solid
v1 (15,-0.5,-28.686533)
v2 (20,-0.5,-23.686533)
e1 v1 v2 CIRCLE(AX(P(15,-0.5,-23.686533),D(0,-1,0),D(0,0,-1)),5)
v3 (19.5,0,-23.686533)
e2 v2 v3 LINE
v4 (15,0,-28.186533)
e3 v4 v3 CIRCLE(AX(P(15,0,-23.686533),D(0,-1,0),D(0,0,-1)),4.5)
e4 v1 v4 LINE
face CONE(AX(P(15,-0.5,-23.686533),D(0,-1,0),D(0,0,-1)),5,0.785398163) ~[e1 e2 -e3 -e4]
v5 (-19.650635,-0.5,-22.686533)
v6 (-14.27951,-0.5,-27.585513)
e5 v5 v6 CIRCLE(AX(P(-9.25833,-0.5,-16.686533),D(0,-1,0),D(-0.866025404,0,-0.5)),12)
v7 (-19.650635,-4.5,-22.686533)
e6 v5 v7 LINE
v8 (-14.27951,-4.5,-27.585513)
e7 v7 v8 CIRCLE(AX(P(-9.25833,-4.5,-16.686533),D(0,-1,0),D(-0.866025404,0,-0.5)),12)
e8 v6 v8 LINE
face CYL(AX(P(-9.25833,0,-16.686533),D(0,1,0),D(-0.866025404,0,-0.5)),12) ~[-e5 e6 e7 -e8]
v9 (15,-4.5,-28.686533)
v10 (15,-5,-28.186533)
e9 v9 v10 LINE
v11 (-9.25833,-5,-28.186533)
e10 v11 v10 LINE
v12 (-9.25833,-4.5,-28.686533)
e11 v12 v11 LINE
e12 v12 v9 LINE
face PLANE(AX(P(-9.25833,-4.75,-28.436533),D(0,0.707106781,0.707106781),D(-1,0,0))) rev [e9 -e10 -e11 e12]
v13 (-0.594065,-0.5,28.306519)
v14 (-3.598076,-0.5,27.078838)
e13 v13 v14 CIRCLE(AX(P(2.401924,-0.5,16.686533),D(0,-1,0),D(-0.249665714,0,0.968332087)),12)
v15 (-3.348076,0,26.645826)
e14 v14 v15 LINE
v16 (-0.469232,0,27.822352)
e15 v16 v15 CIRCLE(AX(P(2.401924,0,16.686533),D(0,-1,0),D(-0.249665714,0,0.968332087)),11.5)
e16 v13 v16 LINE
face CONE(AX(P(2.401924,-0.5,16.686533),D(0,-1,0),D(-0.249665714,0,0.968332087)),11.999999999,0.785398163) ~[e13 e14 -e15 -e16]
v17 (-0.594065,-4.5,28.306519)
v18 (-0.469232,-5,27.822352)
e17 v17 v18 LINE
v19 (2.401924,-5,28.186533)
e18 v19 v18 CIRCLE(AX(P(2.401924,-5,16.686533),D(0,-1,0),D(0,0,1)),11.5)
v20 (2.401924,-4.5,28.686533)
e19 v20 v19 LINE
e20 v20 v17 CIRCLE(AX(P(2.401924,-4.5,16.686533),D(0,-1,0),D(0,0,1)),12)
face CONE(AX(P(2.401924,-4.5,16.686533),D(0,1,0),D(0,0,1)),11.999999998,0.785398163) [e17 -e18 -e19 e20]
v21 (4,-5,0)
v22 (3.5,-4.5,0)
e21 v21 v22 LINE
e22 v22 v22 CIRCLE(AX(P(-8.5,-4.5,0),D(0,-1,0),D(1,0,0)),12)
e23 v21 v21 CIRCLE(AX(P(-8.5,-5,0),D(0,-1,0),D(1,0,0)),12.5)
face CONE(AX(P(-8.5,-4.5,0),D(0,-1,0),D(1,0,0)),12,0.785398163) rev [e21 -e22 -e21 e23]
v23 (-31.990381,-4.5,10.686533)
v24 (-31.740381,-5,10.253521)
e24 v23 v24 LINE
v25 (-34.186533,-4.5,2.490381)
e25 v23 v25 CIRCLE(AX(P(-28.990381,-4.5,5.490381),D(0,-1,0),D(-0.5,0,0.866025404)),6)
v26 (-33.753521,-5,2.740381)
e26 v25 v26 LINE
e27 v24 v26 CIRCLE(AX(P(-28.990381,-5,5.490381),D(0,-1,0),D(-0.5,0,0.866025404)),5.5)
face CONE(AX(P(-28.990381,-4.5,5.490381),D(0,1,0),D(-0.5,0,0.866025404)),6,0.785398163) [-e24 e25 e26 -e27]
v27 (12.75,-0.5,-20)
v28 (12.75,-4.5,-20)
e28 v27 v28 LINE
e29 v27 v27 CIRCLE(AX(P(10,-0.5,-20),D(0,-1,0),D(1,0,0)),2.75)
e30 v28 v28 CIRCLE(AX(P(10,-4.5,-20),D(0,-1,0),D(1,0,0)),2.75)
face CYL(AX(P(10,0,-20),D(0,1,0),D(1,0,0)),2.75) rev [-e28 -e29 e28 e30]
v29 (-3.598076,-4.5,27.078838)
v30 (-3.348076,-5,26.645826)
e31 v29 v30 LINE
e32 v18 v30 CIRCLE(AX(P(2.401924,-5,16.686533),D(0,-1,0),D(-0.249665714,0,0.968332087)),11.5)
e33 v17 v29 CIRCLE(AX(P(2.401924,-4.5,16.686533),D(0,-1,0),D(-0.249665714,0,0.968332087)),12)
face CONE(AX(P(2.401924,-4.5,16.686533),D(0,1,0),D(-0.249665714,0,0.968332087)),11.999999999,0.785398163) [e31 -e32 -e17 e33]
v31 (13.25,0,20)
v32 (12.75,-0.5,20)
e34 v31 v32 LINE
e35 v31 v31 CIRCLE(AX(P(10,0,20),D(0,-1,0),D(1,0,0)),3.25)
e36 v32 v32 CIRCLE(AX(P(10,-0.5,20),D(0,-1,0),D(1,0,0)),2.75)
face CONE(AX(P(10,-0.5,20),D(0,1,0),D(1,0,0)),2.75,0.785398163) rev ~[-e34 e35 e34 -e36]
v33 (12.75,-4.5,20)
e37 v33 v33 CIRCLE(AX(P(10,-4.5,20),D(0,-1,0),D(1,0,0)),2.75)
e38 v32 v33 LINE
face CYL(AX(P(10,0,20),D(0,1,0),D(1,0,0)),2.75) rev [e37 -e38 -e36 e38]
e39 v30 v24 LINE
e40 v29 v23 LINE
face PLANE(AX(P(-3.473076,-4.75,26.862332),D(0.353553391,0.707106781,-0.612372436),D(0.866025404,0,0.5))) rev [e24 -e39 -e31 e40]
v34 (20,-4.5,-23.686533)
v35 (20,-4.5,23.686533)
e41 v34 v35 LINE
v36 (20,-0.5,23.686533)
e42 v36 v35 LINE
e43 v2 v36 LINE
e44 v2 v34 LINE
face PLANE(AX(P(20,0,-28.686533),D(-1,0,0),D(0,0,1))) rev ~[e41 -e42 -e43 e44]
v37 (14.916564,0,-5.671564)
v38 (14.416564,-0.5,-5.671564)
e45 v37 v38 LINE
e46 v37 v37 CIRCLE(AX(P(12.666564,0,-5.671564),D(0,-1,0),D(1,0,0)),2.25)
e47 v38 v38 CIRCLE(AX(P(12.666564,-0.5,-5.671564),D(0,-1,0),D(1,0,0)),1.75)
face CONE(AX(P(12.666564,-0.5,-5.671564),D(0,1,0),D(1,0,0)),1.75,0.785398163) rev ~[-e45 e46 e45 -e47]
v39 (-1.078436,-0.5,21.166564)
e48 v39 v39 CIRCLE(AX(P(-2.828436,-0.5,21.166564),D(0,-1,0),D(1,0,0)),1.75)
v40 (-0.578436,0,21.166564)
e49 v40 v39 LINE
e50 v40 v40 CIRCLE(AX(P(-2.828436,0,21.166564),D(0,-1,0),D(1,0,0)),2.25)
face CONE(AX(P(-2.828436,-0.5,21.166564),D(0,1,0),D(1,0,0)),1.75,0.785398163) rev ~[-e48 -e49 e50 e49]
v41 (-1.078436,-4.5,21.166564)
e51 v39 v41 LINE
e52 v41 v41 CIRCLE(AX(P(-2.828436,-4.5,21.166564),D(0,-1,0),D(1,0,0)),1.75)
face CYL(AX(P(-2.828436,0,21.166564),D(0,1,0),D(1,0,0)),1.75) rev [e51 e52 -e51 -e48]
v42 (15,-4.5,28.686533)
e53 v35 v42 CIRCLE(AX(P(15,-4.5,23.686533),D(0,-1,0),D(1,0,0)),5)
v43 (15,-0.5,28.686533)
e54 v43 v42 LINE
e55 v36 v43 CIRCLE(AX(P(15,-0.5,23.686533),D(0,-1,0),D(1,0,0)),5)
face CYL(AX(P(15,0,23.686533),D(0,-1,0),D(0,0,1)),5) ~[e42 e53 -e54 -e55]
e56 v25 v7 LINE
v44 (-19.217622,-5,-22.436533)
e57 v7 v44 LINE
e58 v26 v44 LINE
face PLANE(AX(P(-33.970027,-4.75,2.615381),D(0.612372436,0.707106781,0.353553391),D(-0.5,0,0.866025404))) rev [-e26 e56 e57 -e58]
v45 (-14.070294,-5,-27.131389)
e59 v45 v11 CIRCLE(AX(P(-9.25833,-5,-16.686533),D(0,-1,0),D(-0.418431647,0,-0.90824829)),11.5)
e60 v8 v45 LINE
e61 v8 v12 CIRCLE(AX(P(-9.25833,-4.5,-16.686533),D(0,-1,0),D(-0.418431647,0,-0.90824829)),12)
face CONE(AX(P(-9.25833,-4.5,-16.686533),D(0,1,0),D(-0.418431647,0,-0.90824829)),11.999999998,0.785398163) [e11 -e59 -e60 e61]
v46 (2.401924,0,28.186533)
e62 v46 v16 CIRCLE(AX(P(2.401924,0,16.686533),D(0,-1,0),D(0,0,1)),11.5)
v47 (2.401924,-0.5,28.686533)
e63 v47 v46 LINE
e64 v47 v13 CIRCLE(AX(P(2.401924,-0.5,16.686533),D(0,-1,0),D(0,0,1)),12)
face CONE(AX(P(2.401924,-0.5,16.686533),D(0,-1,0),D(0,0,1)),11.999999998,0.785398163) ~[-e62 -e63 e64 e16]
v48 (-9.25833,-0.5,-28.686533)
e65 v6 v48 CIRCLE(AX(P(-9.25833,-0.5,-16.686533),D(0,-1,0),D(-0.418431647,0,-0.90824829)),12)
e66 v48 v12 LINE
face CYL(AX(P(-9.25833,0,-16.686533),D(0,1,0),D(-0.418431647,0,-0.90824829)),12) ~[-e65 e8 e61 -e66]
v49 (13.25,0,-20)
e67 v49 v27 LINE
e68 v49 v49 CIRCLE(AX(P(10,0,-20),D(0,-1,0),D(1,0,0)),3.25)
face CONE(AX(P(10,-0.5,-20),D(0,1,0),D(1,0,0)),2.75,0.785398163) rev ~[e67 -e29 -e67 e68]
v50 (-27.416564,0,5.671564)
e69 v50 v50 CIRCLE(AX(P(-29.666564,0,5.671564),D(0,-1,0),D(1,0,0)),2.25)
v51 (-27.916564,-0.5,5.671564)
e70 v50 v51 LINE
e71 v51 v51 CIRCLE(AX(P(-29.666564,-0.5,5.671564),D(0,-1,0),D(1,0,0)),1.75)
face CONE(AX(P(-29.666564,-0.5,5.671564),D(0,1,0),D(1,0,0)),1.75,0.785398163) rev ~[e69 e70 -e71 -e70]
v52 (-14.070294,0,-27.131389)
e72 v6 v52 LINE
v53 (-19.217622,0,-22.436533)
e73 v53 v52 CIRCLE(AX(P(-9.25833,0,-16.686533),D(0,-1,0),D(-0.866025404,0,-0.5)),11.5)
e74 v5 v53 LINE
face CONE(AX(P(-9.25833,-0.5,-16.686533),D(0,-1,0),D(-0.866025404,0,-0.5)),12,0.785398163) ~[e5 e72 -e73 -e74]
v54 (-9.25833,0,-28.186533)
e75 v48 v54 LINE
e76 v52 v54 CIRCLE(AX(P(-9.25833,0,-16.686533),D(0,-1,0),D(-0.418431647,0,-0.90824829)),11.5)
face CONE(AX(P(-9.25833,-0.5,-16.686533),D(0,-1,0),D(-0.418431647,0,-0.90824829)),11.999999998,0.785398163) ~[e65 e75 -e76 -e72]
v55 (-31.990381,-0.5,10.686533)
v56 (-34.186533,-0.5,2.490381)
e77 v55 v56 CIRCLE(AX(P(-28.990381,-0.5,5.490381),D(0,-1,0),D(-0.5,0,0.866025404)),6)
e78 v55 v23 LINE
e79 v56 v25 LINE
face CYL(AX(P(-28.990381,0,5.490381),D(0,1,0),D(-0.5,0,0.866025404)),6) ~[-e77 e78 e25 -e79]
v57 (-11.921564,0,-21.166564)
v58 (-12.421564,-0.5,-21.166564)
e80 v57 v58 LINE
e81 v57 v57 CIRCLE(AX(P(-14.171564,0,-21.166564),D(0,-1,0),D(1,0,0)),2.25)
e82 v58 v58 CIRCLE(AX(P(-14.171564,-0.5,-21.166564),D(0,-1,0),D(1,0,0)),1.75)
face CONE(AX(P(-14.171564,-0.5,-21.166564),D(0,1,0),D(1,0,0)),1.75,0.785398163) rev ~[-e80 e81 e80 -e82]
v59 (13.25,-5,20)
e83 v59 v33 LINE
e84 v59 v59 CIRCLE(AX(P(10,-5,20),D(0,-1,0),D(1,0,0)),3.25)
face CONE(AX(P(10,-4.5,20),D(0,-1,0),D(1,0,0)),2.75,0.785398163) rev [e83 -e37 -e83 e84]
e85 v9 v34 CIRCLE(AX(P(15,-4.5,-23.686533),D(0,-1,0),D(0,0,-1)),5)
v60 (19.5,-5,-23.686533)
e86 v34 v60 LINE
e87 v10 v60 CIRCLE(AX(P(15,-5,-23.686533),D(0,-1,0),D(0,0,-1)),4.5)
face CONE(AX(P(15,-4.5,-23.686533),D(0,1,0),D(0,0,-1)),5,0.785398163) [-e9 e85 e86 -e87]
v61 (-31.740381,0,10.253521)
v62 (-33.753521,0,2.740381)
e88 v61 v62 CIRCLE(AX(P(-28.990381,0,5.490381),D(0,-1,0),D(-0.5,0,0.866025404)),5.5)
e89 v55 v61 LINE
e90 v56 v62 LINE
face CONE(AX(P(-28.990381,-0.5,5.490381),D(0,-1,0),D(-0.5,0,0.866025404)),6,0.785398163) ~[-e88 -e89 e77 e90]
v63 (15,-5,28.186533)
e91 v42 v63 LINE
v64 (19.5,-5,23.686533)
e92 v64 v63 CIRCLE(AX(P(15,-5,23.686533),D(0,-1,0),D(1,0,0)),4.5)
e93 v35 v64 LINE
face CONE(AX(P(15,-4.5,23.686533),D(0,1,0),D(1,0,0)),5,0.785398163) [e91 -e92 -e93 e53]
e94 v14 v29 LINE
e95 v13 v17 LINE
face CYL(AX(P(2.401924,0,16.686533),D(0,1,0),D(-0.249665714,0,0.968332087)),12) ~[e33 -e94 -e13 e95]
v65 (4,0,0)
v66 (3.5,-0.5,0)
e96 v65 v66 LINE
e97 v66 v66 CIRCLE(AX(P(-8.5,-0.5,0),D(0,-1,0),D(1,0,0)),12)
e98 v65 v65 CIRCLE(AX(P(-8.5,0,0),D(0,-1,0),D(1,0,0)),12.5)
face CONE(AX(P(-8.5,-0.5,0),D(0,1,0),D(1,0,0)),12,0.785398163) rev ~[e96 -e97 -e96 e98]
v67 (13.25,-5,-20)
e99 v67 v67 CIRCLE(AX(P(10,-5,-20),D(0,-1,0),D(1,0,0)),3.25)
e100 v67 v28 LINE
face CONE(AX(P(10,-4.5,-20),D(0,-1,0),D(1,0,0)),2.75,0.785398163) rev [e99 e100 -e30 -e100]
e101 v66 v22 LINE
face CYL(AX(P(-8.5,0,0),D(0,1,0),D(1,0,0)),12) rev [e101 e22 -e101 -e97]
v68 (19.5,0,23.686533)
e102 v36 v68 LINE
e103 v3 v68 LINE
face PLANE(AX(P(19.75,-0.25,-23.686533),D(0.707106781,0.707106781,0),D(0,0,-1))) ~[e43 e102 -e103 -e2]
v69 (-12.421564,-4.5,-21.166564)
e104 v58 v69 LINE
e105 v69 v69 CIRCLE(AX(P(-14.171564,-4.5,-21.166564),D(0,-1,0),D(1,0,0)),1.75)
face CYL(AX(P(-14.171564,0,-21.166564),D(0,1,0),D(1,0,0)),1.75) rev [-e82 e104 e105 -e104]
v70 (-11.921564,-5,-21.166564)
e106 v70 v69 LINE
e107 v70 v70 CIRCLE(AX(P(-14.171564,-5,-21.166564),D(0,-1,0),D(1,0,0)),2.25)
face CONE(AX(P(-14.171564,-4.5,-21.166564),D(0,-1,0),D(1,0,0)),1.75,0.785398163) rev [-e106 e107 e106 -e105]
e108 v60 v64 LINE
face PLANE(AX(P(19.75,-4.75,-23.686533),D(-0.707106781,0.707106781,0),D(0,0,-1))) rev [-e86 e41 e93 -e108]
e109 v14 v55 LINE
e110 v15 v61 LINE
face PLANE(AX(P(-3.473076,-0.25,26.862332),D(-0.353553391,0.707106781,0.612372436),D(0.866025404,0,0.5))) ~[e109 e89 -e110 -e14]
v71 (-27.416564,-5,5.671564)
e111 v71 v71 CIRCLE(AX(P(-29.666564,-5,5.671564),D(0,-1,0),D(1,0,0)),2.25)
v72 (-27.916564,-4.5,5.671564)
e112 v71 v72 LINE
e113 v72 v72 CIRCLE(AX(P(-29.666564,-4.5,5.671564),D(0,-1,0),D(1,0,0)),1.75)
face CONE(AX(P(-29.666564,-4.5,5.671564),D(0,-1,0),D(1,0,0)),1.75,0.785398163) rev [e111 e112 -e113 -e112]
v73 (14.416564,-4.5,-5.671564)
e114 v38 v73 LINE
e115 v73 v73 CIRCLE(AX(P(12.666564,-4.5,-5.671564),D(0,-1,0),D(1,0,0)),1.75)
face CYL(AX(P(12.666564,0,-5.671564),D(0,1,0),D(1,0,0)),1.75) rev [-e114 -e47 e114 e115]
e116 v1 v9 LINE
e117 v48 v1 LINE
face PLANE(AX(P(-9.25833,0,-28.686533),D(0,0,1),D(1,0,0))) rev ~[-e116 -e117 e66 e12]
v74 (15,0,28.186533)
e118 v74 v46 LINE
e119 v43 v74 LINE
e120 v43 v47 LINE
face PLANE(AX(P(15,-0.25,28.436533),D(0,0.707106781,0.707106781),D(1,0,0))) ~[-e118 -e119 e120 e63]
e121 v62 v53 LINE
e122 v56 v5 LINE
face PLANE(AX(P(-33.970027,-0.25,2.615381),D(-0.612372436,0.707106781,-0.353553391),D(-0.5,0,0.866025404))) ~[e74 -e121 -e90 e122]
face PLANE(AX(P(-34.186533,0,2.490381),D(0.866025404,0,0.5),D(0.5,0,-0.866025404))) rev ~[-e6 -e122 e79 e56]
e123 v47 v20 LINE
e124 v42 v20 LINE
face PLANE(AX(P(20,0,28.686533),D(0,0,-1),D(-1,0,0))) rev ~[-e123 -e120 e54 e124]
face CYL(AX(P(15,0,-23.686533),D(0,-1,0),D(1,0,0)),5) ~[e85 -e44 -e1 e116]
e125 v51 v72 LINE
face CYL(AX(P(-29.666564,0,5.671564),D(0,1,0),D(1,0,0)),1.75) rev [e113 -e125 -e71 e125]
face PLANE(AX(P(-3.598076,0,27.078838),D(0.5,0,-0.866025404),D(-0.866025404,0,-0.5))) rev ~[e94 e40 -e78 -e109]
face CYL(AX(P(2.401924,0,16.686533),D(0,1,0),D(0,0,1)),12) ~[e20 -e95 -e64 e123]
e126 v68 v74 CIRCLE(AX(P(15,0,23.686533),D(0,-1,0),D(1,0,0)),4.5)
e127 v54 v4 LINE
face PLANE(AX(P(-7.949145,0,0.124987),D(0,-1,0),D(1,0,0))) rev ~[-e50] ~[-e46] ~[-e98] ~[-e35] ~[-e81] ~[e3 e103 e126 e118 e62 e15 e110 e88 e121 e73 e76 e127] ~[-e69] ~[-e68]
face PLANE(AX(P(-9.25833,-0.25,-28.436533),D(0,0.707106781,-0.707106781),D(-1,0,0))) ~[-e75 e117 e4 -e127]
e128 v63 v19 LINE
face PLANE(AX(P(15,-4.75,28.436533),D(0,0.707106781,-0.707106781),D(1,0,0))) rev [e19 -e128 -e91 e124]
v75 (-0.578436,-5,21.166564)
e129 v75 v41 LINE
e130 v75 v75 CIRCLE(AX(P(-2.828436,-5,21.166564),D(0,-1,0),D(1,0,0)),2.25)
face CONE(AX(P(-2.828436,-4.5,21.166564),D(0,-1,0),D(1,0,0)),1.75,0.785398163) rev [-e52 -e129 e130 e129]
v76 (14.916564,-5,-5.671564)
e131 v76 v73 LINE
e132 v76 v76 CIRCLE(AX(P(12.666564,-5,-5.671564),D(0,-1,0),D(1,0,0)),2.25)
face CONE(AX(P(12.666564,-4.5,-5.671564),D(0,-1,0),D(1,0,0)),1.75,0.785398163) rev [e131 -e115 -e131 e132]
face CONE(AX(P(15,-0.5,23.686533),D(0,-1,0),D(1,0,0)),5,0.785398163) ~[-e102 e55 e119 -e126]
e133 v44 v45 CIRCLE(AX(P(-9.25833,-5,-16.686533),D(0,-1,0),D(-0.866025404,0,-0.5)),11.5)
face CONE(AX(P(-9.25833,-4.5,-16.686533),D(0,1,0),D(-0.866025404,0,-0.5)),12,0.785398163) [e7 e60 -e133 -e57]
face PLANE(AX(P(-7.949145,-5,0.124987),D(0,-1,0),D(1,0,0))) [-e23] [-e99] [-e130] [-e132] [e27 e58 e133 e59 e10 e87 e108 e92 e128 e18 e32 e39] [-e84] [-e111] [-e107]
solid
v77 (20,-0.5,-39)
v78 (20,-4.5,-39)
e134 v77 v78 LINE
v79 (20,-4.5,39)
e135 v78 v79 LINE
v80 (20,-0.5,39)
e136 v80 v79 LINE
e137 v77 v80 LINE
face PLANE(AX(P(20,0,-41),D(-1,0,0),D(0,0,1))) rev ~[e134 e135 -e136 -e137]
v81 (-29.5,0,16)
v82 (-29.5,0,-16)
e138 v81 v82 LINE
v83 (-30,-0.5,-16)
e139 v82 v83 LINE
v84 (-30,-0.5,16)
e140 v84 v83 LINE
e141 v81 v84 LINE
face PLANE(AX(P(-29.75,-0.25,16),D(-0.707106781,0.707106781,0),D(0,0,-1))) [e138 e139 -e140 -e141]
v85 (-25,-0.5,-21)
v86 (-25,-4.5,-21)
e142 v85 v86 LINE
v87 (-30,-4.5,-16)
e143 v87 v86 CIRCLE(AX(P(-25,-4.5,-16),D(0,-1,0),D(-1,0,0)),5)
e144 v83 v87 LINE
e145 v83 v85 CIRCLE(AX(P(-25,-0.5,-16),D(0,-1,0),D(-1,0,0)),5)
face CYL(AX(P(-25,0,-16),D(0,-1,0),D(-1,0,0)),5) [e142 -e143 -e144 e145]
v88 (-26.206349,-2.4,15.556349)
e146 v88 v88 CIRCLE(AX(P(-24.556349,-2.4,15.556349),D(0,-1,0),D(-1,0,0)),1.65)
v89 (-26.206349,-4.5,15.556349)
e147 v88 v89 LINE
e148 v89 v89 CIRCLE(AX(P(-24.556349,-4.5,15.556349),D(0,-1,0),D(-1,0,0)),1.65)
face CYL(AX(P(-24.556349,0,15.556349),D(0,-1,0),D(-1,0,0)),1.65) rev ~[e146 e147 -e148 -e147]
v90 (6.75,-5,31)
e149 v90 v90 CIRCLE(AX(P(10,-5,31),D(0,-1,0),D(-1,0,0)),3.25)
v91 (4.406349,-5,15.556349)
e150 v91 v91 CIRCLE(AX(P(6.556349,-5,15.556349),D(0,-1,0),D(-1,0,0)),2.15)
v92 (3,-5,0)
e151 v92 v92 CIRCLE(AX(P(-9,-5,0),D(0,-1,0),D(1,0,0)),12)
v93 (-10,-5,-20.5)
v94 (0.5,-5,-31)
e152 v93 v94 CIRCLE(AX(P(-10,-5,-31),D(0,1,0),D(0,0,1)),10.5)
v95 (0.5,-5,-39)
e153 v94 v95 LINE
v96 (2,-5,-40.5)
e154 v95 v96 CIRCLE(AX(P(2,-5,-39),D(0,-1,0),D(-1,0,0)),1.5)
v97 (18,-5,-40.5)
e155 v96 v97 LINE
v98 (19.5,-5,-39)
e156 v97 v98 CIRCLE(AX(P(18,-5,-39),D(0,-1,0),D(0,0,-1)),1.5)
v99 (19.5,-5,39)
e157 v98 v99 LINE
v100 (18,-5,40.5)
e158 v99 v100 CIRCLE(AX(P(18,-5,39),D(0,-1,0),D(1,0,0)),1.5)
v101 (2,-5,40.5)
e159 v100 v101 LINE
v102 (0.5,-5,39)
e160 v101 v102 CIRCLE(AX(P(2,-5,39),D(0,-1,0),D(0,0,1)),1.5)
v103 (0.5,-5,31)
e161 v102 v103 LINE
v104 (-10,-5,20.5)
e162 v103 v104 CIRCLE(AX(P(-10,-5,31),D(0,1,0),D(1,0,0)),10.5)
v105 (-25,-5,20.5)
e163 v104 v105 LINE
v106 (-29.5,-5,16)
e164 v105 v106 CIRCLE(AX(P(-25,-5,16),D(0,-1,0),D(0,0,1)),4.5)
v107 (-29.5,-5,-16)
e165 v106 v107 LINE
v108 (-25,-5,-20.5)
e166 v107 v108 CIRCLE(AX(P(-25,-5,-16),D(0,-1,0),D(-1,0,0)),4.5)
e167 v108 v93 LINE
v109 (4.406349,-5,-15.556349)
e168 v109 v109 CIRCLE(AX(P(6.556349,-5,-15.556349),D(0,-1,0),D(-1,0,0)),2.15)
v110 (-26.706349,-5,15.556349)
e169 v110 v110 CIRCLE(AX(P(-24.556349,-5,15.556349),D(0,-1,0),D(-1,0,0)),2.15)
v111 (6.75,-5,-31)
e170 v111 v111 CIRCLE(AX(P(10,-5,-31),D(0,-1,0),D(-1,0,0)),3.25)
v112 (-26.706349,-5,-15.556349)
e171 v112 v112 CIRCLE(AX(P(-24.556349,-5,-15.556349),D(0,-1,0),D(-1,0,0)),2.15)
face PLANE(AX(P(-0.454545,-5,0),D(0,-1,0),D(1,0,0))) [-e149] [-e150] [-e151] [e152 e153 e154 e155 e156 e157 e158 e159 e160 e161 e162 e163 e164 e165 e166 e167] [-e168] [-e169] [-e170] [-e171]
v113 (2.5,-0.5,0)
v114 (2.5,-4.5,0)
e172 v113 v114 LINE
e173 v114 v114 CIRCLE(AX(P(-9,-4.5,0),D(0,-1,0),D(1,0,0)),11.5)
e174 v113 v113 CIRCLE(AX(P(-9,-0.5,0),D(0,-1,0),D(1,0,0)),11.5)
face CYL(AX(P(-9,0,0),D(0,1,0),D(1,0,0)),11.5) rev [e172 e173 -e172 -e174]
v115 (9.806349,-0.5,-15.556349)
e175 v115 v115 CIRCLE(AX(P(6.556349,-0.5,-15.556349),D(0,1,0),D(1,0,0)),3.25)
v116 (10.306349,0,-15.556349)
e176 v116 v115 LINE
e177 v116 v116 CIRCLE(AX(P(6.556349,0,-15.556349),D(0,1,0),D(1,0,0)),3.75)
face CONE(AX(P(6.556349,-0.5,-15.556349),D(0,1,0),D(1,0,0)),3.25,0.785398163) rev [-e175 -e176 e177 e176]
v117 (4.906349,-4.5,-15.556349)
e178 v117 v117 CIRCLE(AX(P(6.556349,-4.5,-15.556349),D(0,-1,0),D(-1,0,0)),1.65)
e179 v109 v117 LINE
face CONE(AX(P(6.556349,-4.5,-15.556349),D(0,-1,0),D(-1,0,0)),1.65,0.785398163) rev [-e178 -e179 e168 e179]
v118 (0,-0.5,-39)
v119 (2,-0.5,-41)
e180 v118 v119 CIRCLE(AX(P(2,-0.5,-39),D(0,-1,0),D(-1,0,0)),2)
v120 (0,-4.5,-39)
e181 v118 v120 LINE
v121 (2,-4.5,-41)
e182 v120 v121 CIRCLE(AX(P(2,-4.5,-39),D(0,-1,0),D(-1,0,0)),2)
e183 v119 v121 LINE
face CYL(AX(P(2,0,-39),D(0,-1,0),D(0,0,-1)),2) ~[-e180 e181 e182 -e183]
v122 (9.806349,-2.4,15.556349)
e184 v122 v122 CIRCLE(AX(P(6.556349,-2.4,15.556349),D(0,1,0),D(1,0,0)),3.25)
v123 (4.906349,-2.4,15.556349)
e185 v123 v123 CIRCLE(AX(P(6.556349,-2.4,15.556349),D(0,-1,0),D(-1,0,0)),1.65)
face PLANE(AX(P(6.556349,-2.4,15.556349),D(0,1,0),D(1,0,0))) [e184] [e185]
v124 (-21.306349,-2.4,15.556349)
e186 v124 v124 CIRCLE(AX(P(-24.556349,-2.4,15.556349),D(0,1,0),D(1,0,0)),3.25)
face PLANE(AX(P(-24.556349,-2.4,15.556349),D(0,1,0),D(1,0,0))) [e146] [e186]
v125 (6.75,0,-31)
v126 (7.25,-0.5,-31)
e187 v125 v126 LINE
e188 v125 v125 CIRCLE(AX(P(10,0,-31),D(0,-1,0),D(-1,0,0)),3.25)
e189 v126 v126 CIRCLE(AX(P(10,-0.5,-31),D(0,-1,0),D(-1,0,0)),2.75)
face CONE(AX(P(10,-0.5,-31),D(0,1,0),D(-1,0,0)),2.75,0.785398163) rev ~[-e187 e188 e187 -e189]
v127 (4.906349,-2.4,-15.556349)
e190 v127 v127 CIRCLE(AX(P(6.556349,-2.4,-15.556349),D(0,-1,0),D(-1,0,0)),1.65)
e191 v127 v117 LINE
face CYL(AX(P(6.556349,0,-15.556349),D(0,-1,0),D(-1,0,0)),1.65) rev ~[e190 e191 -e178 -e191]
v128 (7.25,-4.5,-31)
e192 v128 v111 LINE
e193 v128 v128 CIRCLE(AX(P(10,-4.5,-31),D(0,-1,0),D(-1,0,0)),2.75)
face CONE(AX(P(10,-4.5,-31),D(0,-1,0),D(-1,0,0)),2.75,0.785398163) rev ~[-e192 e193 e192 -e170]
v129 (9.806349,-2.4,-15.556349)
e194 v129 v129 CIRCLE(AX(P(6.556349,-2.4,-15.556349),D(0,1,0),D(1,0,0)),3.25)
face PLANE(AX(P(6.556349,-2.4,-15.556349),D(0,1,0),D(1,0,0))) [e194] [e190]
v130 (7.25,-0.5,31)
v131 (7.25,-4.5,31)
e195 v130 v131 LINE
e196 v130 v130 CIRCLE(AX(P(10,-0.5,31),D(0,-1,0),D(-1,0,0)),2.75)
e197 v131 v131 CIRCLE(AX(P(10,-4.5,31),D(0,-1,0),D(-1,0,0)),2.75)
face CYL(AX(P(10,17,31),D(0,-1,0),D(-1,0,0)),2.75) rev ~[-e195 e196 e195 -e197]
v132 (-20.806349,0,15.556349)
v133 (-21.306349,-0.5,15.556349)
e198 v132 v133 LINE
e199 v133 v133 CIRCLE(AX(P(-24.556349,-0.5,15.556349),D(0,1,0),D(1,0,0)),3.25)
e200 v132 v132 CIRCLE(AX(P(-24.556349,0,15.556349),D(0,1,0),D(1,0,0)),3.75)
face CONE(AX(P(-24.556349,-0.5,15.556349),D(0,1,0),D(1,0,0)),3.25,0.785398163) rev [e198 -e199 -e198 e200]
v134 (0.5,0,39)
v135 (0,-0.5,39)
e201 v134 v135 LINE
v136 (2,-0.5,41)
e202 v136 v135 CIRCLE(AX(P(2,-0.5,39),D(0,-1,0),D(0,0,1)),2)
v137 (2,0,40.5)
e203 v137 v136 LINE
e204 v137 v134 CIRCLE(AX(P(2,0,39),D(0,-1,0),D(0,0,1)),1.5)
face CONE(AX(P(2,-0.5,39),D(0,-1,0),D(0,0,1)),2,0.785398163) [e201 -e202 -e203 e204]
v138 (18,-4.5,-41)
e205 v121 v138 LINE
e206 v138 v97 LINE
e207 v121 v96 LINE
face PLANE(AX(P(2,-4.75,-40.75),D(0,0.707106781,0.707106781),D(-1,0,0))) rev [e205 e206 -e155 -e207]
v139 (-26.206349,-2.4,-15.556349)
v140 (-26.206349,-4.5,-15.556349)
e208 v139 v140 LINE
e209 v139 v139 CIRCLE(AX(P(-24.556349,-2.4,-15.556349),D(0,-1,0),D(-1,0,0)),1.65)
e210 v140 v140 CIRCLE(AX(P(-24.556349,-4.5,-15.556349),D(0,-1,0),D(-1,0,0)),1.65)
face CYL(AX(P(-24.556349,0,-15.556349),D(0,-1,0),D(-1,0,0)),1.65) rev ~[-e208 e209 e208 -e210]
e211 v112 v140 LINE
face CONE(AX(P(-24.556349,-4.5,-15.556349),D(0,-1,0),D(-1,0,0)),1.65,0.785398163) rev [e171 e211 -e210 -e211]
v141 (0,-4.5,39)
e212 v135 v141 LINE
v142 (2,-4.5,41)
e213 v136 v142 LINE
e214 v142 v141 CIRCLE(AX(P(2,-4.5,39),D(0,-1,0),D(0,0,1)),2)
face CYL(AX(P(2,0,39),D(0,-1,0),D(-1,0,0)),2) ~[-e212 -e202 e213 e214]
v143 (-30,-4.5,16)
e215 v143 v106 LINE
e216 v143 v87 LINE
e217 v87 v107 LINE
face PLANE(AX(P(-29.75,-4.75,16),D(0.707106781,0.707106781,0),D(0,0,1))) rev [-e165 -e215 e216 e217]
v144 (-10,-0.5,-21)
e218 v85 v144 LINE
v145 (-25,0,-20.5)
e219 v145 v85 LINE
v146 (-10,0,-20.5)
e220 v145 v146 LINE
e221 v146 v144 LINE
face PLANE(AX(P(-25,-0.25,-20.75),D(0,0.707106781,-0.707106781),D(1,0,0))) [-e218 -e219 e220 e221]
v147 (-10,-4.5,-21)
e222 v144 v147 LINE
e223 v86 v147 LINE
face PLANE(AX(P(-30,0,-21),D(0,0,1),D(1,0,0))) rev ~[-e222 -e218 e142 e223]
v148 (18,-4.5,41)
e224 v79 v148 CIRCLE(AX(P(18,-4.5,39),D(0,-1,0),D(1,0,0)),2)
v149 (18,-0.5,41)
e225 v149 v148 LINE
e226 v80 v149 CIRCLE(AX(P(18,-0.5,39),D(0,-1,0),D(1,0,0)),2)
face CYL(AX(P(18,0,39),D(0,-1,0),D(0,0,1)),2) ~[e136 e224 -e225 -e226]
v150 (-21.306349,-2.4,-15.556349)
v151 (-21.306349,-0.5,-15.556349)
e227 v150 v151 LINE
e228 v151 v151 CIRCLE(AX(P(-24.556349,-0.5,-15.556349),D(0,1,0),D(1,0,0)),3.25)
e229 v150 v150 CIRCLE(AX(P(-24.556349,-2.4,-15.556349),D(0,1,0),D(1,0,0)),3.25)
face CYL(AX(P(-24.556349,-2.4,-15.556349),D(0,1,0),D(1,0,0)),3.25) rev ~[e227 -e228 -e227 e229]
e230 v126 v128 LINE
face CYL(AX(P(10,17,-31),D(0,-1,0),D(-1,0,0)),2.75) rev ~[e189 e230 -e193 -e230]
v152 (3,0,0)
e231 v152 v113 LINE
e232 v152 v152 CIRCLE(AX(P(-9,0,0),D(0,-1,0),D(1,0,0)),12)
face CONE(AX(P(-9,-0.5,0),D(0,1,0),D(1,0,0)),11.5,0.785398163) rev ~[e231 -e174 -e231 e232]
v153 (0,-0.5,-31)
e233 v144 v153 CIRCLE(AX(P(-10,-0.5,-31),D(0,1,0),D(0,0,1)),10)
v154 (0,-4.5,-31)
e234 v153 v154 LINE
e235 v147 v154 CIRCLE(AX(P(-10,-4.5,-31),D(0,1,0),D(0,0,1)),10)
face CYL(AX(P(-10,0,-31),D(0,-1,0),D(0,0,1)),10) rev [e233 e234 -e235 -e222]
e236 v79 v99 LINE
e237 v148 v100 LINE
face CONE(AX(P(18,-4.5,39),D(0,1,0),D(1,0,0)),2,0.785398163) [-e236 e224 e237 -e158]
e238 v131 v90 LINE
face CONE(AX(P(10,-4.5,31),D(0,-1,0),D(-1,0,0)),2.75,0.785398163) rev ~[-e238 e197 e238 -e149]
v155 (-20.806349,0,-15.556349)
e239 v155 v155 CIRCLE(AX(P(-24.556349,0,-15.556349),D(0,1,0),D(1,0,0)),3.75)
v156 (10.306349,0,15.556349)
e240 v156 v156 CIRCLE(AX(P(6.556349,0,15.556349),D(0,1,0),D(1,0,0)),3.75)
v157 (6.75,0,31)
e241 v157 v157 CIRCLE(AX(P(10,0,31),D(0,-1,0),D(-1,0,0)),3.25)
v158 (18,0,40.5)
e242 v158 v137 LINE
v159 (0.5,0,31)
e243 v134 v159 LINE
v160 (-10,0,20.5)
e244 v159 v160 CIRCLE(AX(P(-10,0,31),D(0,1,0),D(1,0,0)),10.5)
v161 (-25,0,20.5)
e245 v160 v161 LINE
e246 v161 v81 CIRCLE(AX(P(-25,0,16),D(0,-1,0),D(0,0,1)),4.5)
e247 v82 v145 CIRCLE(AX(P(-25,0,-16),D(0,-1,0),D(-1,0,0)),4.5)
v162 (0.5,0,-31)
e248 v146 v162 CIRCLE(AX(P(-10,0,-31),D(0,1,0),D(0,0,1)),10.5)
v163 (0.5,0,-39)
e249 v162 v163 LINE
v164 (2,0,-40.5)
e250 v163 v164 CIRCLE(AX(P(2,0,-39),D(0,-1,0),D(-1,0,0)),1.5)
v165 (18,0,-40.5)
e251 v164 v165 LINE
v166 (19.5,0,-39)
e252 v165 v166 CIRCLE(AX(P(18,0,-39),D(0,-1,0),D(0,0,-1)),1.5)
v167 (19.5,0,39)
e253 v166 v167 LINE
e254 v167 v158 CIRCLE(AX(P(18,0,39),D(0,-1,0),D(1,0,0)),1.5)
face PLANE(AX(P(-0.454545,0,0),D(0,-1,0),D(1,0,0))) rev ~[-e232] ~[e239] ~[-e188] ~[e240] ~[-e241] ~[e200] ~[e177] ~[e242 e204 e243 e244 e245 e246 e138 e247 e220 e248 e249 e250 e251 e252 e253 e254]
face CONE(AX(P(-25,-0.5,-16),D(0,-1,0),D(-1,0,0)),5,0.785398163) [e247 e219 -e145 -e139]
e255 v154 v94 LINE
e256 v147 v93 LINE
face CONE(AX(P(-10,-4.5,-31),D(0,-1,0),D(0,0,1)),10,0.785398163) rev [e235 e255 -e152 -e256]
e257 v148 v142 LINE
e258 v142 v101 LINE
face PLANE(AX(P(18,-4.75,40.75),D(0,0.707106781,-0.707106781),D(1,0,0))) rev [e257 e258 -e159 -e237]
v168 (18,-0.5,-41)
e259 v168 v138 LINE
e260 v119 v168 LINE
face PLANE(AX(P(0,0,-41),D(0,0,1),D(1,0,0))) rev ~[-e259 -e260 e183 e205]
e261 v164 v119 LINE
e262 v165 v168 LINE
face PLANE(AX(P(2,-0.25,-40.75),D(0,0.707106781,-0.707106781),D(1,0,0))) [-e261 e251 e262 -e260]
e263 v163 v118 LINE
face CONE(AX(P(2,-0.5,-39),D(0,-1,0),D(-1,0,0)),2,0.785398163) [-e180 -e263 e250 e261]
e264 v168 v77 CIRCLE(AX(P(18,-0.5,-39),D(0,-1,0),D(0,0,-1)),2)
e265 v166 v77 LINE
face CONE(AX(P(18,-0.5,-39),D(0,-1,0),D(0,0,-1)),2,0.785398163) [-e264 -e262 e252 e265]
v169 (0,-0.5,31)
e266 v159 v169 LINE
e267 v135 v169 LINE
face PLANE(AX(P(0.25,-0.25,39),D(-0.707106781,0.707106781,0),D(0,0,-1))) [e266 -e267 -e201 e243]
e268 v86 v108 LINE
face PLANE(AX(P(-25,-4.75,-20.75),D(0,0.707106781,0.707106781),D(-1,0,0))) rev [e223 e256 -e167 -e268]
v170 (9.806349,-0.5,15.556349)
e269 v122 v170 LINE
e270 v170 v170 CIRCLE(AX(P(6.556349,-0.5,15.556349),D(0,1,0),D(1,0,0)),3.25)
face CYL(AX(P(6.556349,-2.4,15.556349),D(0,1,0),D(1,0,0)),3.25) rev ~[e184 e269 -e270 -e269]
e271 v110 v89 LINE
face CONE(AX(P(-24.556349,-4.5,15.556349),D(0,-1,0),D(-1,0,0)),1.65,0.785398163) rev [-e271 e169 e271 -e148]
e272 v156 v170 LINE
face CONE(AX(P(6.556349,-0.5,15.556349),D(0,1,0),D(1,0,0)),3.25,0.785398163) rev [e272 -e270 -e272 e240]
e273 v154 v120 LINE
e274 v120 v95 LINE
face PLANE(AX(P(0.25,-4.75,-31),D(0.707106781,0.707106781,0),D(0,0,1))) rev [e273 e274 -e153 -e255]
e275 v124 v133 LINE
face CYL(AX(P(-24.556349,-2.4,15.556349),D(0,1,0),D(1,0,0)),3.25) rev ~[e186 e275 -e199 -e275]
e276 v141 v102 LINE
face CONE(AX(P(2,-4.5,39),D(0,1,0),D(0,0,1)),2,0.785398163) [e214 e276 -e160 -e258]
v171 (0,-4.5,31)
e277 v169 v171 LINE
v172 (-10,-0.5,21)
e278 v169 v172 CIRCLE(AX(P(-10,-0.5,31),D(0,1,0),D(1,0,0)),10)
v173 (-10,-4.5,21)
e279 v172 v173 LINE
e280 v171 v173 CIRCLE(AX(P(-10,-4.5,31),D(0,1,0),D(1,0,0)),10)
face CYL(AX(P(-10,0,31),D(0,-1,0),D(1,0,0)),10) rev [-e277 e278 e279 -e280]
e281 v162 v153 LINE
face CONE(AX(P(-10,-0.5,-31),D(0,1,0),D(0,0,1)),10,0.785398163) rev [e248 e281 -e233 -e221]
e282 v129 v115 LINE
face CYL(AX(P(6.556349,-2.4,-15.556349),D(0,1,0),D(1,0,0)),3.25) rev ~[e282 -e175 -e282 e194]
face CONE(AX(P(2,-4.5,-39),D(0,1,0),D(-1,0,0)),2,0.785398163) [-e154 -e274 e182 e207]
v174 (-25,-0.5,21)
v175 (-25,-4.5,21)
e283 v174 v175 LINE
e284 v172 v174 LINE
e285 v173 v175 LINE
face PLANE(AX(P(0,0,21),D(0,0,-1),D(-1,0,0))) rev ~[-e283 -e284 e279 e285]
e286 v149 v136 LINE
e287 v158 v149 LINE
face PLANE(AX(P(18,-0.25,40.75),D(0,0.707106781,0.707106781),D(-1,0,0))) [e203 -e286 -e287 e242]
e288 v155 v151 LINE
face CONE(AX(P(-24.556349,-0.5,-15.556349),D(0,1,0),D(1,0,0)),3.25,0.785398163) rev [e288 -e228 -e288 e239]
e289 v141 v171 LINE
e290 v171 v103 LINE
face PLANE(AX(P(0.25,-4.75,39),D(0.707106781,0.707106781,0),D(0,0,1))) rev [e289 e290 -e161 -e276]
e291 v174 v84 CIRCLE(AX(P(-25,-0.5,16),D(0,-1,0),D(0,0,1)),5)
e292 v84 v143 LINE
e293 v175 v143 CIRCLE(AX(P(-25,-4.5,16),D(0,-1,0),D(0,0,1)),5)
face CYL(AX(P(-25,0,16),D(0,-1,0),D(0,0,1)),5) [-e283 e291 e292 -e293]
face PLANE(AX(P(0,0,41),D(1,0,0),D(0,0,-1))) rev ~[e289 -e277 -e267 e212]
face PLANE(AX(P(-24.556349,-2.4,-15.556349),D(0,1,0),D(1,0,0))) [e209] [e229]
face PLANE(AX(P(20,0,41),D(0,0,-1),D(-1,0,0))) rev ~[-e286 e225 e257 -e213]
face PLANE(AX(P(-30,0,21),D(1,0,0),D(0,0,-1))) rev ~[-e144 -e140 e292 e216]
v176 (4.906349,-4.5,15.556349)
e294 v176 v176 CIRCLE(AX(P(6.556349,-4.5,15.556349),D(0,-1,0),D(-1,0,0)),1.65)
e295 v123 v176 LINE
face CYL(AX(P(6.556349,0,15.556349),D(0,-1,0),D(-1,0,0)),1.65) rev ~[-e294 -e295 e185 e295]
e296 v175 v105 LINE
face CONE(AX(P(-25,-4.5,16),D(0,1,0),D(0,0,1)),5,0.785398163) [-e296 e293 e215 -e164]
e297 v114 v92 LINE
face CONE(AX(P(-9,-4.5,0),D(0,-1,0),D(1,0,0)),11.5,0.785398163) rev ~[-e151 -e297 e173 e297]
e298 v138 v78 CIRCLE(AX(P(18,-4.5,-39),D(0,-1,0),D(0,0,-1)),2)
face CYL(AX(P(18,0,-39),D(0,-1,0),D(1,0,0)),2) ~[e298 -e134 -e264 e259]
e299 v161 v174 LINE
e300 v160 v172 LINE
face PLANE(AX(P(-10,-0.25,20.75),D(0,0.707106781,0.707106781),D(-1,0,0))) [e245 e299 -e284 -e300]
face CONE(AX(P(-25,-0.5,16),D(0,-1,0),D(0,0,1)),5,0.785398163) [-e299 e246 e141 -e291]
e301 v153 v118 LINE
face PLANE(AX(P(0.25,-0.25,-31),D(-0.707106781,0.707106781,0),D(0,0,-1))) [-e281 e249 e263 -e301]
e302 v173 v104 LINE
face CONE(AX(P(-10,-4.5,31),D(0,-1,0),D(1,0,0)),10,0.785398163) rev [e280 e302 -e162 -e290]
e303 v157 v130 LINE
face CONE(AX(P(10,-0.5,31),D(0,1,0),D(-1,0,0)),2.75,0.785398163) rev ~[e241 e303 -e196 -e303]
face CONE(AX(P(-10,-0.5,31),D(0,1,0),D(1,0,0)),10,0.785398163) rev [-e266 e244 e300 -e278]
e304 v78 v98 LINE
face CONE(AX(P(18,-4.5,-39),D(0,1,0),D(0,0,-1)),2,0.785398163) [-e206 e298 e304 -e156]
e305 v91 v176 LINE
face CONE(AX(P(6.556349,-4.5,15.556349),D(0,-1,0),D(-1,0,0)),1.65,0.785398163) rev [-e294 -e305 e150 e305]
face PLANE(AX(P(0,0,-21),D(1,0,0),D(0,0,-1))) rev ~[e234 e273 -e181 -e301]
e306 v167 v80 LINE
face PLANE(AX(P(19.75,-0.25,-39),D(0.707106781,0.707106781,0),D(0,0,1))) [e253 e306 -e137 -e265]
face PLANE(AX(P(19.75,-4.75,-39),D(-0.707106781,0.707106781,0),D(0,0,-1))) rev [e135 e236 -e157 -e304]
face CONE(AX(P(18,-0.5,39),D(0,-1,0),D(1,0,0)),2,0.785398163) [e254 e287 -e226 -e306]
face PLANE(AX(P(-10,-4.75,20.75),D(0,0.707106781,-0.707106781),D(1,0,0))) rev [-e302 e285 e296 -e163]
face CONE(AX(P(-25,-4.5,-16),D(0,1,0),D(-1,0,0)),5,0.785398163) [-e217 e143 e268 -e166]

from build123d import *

# Parameters (mm, degrees)
F0_R           = 1.75
F0_R_2         = 12
F0_R_3         = 2.75
F1_DEPTH       = 5
F2_R           = 5
F3_SIZE        = 0.5
F4_R           = 11.5
F5_DEPTH       = 5
F6_D           = 5.5
F6_DEPTH       = 17
F6_TIP         = 1.6523667023
F7_D           = 3.3
F7_DEPTH       = 17
F7_CBORE_D     = 6.5
F7_CBORE_DEPTH = 2.4
F7_TIP         = 0.9914200214
F8_R           = 10
F9_R           = 5
F10_R          = 2
F11_SIZE       = 0.5


with BuildPart() as f1:
    # F0 (on Front) → F1 (new body)
    with BuildSketch(Plane.XZ):
        with BuildLine():
            Line((20, -7.3634480157), (-0.5940647845, 28.3065185255))
            ThreePointArc((-0.5940647845, 28.3065185255), (-2.137762574, 27.7946947913), (-3.5980762114, 27.0788383249))
            Line((-3.5980762114, 27.0788383249), (-31.9903810568, 10.6865334795))
            ThreePointArc((-31.9903810568, 10.6865334795), (-34.7859360145, 7.0432953274), (-34.1865334795, 2.4903810568))
            Line((-34.1865334795, 2.4903810568), (-19.6506350946, -22.6865334795))
            ThreePointArc((-19.6506350946, -22.6865334795), (-17.3449783133, -25.5525429024), (-14.2795100083, -27.585512965))
            Line((-14.2795100083, -27.585512965), (20, -7.7942286341))
            Line((20, -7.7942286341), (20, -7.3634480157))
        make_face()
        with Locations((-14.1715636316, -21.1665636316)):
            Circle(F0_R, mode=Mode.SUBTRACT)
        with Locations((12.6665636316, -5.6715636316)):
            Circle(F0_R, mode=Mode.SUBTRACT)
        with Locations((-29.6665636316, 5.6715636316)):
            Circle(F0_R, mode=Mode.SUBTRACT)
        with Locations((-8.5, 0)):
            Circle(F0_R_2, mode=Mode.SUBTRACT)
        with Locations((-2.8284363684, 21.1665636316)):
            Circle(F0_R, mode=Mode.SUBTRACT)
        with BuildLine():
            ThreePointArc((2.4019237886, 28.6865334795), (0.8919271913, 28.5911506626), (-0.5940647845, 28.3065185255))
            Line((-0.5940647845, 28.3065185255), (20, -7.3634480157))
            Line((20, -7.3634480157), (20, 28.6865334795))
            Line((20, 28.6865334795), (2.4019237886, 28.6865334795))
        make_face()
        with Locations((10, 20)):
            Circle(F0_R_3, mode=Mode.SUBTRACT)
        with BuildLine():
            Line((20, -28.6865334795), (20, -7.7942286341))
            Line((20, -7.7942286341), (-14.2795100083, -27.585512965))
            ThreePointArc((-14.2795100083, -27.585512965), (-11.8285681928, -28.408046902), (-9.2583302492, -28.6865334795))
            Line((-9.2583302492, -28.6865334795), (20, -28.6865334795))
        make_face()
        with Locations((10, -20)):
            Circle(F0_R_3, mode=Mode.SUBTRACT)
    extrude(amount=F1_DEPTH)

    # F2
    f2_edges = [f1.edges().sort_by_distance(p)[0] for p in [
        (20, -2.5, -28.686533),
        (20, -2.5, 28.686533),
    ]]
    fillet(f2_edges, radius=F2_R)

    # F3
    f3_edges = [f1.edges().sort_by_distance(p)[0] for p in [
        (8.700962, -5, 28.686533),
        (18.535534, -5, 27.222067),
        (-0.703905, -5, 28.277643),
        (20, -5, 0),
        (-17.794229, -5, 18.882686),
        (18.535534, -5, -27.222067),
        (-34.785936, -5, 7.043295),
        (2.870835, -5, -28.686533),
        (-26.918584, -5, -10.098076),
        (-15.25833, -5, -27.078838),
        (-15.921564, -5, -21.166564),
        (10.916564, -5, -5.671564),
        (-31.416564, -5, 5.671564),
        (-20.5, -5, 0),
        (-4.578436, -5, 21.166564),
        (7.25, -5, 20),
        (7.25, -5, -20),
        (8.700962, 0, 28.686533),
        (18.535534, 0, 27.222067),
        (-0.703905, 0, 28.277643),
        (20, 0, 0),
        (-17.794229, 0, 18.882686),
        (18.535534, 0, -27.222067),
        (-34.785936, 0, 7.043295),
        (2.870835, 0, -28.686533),
        (-26.918584, 0, -10.098076),
        (-15.25833, 0, -27.078838),
        (-15.921564, 0, -21.166564),
        (10.916564, 0, -5.671564),
        (-31.416564, 0, 5.671564),
        (-20.5, 0, 0),
        (-4.578436, 0, 21.166564),
        (7.25, 0, 20),
        (7.25, 0, -20),
    ]]
    chamfer(f3_edges, length=F3_SIZE)


with BuildPart() as f5:
    # F4 (on Front) → F5 (new body)
    with BuildSketch(Plane.XZ):
        Polygon((0, 41), (0, 21), (-30, 21), (-30, -21), (0, -21), (0, -41), (20, -41), (20, 41), align=None)
        with Locations((-9, 0)):
            Circle(F4_R, mode=Mode.SUBTRACT)
    extrude(amount=F5_DEPTH)

    # F6
    with Locations(Plane(origin=(0, 0, 0), x_dir=(1, 0, 0), z_dir=(0, 1, 0))):
        with Locations((10, -31), (10, 31)):
            Hole(F6_D / 2, depth=F6_DEPTH)
            with Locations((0, 0, -(F6_DEPTH + F6_TIP / 2))):  # 118° drill point
                Cone(0, F6_D / 2, F6_TIP, mode=Mode.SUBTRACT)

    # F7
    with Locations(Plane(origin=(0, 0, 0), x_dir=(1, 0, 0), z_dir=(0, 1, 0))):
        with Locations((-24.5563491861, -15.5563491861), (-24.5563491861, 15.5563491861), (6.5563491861, 15.5563491861), (6.5563491861, -15.5563491861)):
            CounterBoreHole(F7_D / 2, F7_CBORE_D / 2, F7_CBORE_DEPTH, depth=F7_DEPTH)
            with Locations((0, 0, -(F7_DEPTH + F7_TIP / 2))):  # 118° drill point
                Cone(0, F7_D / 2, F7_TIP, mode=Mode.SUBTRACT)

    # F8
    f8_edges = [f5.edges().sort_by_distance(p)[0] for p in [
        (0, -2.5, -21),
        (0, -2.5, 21),
    ]]
    fillet(f8_edges, radius=F8_R)

    # F9
    f9_edges = [f5.edges().sort_by_distance(p)[0] for p in [
        (-30, -2.5, 21),
        (-30, -2.5, -21),
    ]]
    fillet(f9_edges, radius=F9_R)

    # F10
    f10_edges = [f5.edges().sort_by_distance(p)[0] for p in [
        (20, -2.5, 41),
        (20, -2.5, -41),
        (0, -2.5, 41),
        (0, -2.5, -41),
    ]]
    fillet(f10_edges, radius=F10_R)

    # F11
    f11_edges = [f5.edges().sort_by_distance(p)[0] for p in [
        (0, -5, 35),
        (0.585786, -5, 40.414214),
        (-2.928932, -5, 23.928932),
        (10, -5, 41),
        (-17.5, -5, 21),
        (19.414214, -5, 40.414214),
        (-28.535534, -5, 19.535534),
        (20, -5, 0),
        (-30, -5, 0),
        (19.414214, -5, -40.414214),
        (-28.535534, -5, -19.535534),
        (10, -5, -41),
        (-17.5, -5, -21),
        (0.585786, -5, -40.414214),
        (-2.928932, -5, -23.928932),
        (0, -5, -35),
        (-26.206349, -5, -15.556349),
        (7.25, -5, -31),
        (4.906349, -5, -15.556349),
        (-26.206349, -5, 15.556349),
        (-20.5, -5, 0),
        (4.906349, -5, 15.556349),
        (7.25, -5, 31),
        (0, 0, 35),
        (0.585786, 0, 40.414214),
        (-2.928932, 0, 23.928932),
        (10, 0, 41),
        (-17.5, 0, 21),
        (19.414214, 0, 40.414214),
        (-28.535534, 0, 19.535534),
        (20, 0, 0),
        (-30, 0, 0),
        (19.414214, 0, -40.414214),
        (-28.535534, 0, -19.535534),
        (10, 0, -41),
        (-17.5, 0, -21),
        (0.585786, 0, -40.414214),
        (-2.928932, 0, -23.928932),
        (0, 0, -35),
        (-27.806349, 0, -15.556349),
        (7.25, 0, -31),
        (3.306349, 0, -15.556349),
        (-27.806349, 0, 15.556349),
        (-20.5, 0, 0),
        (3.306349, 0, 15.556349),
        (7.25, 0, 31),
    ]]
    chamfer(f11_edges, length=F11_SIZE)


solid = Compound([f1.part, f5.part])
